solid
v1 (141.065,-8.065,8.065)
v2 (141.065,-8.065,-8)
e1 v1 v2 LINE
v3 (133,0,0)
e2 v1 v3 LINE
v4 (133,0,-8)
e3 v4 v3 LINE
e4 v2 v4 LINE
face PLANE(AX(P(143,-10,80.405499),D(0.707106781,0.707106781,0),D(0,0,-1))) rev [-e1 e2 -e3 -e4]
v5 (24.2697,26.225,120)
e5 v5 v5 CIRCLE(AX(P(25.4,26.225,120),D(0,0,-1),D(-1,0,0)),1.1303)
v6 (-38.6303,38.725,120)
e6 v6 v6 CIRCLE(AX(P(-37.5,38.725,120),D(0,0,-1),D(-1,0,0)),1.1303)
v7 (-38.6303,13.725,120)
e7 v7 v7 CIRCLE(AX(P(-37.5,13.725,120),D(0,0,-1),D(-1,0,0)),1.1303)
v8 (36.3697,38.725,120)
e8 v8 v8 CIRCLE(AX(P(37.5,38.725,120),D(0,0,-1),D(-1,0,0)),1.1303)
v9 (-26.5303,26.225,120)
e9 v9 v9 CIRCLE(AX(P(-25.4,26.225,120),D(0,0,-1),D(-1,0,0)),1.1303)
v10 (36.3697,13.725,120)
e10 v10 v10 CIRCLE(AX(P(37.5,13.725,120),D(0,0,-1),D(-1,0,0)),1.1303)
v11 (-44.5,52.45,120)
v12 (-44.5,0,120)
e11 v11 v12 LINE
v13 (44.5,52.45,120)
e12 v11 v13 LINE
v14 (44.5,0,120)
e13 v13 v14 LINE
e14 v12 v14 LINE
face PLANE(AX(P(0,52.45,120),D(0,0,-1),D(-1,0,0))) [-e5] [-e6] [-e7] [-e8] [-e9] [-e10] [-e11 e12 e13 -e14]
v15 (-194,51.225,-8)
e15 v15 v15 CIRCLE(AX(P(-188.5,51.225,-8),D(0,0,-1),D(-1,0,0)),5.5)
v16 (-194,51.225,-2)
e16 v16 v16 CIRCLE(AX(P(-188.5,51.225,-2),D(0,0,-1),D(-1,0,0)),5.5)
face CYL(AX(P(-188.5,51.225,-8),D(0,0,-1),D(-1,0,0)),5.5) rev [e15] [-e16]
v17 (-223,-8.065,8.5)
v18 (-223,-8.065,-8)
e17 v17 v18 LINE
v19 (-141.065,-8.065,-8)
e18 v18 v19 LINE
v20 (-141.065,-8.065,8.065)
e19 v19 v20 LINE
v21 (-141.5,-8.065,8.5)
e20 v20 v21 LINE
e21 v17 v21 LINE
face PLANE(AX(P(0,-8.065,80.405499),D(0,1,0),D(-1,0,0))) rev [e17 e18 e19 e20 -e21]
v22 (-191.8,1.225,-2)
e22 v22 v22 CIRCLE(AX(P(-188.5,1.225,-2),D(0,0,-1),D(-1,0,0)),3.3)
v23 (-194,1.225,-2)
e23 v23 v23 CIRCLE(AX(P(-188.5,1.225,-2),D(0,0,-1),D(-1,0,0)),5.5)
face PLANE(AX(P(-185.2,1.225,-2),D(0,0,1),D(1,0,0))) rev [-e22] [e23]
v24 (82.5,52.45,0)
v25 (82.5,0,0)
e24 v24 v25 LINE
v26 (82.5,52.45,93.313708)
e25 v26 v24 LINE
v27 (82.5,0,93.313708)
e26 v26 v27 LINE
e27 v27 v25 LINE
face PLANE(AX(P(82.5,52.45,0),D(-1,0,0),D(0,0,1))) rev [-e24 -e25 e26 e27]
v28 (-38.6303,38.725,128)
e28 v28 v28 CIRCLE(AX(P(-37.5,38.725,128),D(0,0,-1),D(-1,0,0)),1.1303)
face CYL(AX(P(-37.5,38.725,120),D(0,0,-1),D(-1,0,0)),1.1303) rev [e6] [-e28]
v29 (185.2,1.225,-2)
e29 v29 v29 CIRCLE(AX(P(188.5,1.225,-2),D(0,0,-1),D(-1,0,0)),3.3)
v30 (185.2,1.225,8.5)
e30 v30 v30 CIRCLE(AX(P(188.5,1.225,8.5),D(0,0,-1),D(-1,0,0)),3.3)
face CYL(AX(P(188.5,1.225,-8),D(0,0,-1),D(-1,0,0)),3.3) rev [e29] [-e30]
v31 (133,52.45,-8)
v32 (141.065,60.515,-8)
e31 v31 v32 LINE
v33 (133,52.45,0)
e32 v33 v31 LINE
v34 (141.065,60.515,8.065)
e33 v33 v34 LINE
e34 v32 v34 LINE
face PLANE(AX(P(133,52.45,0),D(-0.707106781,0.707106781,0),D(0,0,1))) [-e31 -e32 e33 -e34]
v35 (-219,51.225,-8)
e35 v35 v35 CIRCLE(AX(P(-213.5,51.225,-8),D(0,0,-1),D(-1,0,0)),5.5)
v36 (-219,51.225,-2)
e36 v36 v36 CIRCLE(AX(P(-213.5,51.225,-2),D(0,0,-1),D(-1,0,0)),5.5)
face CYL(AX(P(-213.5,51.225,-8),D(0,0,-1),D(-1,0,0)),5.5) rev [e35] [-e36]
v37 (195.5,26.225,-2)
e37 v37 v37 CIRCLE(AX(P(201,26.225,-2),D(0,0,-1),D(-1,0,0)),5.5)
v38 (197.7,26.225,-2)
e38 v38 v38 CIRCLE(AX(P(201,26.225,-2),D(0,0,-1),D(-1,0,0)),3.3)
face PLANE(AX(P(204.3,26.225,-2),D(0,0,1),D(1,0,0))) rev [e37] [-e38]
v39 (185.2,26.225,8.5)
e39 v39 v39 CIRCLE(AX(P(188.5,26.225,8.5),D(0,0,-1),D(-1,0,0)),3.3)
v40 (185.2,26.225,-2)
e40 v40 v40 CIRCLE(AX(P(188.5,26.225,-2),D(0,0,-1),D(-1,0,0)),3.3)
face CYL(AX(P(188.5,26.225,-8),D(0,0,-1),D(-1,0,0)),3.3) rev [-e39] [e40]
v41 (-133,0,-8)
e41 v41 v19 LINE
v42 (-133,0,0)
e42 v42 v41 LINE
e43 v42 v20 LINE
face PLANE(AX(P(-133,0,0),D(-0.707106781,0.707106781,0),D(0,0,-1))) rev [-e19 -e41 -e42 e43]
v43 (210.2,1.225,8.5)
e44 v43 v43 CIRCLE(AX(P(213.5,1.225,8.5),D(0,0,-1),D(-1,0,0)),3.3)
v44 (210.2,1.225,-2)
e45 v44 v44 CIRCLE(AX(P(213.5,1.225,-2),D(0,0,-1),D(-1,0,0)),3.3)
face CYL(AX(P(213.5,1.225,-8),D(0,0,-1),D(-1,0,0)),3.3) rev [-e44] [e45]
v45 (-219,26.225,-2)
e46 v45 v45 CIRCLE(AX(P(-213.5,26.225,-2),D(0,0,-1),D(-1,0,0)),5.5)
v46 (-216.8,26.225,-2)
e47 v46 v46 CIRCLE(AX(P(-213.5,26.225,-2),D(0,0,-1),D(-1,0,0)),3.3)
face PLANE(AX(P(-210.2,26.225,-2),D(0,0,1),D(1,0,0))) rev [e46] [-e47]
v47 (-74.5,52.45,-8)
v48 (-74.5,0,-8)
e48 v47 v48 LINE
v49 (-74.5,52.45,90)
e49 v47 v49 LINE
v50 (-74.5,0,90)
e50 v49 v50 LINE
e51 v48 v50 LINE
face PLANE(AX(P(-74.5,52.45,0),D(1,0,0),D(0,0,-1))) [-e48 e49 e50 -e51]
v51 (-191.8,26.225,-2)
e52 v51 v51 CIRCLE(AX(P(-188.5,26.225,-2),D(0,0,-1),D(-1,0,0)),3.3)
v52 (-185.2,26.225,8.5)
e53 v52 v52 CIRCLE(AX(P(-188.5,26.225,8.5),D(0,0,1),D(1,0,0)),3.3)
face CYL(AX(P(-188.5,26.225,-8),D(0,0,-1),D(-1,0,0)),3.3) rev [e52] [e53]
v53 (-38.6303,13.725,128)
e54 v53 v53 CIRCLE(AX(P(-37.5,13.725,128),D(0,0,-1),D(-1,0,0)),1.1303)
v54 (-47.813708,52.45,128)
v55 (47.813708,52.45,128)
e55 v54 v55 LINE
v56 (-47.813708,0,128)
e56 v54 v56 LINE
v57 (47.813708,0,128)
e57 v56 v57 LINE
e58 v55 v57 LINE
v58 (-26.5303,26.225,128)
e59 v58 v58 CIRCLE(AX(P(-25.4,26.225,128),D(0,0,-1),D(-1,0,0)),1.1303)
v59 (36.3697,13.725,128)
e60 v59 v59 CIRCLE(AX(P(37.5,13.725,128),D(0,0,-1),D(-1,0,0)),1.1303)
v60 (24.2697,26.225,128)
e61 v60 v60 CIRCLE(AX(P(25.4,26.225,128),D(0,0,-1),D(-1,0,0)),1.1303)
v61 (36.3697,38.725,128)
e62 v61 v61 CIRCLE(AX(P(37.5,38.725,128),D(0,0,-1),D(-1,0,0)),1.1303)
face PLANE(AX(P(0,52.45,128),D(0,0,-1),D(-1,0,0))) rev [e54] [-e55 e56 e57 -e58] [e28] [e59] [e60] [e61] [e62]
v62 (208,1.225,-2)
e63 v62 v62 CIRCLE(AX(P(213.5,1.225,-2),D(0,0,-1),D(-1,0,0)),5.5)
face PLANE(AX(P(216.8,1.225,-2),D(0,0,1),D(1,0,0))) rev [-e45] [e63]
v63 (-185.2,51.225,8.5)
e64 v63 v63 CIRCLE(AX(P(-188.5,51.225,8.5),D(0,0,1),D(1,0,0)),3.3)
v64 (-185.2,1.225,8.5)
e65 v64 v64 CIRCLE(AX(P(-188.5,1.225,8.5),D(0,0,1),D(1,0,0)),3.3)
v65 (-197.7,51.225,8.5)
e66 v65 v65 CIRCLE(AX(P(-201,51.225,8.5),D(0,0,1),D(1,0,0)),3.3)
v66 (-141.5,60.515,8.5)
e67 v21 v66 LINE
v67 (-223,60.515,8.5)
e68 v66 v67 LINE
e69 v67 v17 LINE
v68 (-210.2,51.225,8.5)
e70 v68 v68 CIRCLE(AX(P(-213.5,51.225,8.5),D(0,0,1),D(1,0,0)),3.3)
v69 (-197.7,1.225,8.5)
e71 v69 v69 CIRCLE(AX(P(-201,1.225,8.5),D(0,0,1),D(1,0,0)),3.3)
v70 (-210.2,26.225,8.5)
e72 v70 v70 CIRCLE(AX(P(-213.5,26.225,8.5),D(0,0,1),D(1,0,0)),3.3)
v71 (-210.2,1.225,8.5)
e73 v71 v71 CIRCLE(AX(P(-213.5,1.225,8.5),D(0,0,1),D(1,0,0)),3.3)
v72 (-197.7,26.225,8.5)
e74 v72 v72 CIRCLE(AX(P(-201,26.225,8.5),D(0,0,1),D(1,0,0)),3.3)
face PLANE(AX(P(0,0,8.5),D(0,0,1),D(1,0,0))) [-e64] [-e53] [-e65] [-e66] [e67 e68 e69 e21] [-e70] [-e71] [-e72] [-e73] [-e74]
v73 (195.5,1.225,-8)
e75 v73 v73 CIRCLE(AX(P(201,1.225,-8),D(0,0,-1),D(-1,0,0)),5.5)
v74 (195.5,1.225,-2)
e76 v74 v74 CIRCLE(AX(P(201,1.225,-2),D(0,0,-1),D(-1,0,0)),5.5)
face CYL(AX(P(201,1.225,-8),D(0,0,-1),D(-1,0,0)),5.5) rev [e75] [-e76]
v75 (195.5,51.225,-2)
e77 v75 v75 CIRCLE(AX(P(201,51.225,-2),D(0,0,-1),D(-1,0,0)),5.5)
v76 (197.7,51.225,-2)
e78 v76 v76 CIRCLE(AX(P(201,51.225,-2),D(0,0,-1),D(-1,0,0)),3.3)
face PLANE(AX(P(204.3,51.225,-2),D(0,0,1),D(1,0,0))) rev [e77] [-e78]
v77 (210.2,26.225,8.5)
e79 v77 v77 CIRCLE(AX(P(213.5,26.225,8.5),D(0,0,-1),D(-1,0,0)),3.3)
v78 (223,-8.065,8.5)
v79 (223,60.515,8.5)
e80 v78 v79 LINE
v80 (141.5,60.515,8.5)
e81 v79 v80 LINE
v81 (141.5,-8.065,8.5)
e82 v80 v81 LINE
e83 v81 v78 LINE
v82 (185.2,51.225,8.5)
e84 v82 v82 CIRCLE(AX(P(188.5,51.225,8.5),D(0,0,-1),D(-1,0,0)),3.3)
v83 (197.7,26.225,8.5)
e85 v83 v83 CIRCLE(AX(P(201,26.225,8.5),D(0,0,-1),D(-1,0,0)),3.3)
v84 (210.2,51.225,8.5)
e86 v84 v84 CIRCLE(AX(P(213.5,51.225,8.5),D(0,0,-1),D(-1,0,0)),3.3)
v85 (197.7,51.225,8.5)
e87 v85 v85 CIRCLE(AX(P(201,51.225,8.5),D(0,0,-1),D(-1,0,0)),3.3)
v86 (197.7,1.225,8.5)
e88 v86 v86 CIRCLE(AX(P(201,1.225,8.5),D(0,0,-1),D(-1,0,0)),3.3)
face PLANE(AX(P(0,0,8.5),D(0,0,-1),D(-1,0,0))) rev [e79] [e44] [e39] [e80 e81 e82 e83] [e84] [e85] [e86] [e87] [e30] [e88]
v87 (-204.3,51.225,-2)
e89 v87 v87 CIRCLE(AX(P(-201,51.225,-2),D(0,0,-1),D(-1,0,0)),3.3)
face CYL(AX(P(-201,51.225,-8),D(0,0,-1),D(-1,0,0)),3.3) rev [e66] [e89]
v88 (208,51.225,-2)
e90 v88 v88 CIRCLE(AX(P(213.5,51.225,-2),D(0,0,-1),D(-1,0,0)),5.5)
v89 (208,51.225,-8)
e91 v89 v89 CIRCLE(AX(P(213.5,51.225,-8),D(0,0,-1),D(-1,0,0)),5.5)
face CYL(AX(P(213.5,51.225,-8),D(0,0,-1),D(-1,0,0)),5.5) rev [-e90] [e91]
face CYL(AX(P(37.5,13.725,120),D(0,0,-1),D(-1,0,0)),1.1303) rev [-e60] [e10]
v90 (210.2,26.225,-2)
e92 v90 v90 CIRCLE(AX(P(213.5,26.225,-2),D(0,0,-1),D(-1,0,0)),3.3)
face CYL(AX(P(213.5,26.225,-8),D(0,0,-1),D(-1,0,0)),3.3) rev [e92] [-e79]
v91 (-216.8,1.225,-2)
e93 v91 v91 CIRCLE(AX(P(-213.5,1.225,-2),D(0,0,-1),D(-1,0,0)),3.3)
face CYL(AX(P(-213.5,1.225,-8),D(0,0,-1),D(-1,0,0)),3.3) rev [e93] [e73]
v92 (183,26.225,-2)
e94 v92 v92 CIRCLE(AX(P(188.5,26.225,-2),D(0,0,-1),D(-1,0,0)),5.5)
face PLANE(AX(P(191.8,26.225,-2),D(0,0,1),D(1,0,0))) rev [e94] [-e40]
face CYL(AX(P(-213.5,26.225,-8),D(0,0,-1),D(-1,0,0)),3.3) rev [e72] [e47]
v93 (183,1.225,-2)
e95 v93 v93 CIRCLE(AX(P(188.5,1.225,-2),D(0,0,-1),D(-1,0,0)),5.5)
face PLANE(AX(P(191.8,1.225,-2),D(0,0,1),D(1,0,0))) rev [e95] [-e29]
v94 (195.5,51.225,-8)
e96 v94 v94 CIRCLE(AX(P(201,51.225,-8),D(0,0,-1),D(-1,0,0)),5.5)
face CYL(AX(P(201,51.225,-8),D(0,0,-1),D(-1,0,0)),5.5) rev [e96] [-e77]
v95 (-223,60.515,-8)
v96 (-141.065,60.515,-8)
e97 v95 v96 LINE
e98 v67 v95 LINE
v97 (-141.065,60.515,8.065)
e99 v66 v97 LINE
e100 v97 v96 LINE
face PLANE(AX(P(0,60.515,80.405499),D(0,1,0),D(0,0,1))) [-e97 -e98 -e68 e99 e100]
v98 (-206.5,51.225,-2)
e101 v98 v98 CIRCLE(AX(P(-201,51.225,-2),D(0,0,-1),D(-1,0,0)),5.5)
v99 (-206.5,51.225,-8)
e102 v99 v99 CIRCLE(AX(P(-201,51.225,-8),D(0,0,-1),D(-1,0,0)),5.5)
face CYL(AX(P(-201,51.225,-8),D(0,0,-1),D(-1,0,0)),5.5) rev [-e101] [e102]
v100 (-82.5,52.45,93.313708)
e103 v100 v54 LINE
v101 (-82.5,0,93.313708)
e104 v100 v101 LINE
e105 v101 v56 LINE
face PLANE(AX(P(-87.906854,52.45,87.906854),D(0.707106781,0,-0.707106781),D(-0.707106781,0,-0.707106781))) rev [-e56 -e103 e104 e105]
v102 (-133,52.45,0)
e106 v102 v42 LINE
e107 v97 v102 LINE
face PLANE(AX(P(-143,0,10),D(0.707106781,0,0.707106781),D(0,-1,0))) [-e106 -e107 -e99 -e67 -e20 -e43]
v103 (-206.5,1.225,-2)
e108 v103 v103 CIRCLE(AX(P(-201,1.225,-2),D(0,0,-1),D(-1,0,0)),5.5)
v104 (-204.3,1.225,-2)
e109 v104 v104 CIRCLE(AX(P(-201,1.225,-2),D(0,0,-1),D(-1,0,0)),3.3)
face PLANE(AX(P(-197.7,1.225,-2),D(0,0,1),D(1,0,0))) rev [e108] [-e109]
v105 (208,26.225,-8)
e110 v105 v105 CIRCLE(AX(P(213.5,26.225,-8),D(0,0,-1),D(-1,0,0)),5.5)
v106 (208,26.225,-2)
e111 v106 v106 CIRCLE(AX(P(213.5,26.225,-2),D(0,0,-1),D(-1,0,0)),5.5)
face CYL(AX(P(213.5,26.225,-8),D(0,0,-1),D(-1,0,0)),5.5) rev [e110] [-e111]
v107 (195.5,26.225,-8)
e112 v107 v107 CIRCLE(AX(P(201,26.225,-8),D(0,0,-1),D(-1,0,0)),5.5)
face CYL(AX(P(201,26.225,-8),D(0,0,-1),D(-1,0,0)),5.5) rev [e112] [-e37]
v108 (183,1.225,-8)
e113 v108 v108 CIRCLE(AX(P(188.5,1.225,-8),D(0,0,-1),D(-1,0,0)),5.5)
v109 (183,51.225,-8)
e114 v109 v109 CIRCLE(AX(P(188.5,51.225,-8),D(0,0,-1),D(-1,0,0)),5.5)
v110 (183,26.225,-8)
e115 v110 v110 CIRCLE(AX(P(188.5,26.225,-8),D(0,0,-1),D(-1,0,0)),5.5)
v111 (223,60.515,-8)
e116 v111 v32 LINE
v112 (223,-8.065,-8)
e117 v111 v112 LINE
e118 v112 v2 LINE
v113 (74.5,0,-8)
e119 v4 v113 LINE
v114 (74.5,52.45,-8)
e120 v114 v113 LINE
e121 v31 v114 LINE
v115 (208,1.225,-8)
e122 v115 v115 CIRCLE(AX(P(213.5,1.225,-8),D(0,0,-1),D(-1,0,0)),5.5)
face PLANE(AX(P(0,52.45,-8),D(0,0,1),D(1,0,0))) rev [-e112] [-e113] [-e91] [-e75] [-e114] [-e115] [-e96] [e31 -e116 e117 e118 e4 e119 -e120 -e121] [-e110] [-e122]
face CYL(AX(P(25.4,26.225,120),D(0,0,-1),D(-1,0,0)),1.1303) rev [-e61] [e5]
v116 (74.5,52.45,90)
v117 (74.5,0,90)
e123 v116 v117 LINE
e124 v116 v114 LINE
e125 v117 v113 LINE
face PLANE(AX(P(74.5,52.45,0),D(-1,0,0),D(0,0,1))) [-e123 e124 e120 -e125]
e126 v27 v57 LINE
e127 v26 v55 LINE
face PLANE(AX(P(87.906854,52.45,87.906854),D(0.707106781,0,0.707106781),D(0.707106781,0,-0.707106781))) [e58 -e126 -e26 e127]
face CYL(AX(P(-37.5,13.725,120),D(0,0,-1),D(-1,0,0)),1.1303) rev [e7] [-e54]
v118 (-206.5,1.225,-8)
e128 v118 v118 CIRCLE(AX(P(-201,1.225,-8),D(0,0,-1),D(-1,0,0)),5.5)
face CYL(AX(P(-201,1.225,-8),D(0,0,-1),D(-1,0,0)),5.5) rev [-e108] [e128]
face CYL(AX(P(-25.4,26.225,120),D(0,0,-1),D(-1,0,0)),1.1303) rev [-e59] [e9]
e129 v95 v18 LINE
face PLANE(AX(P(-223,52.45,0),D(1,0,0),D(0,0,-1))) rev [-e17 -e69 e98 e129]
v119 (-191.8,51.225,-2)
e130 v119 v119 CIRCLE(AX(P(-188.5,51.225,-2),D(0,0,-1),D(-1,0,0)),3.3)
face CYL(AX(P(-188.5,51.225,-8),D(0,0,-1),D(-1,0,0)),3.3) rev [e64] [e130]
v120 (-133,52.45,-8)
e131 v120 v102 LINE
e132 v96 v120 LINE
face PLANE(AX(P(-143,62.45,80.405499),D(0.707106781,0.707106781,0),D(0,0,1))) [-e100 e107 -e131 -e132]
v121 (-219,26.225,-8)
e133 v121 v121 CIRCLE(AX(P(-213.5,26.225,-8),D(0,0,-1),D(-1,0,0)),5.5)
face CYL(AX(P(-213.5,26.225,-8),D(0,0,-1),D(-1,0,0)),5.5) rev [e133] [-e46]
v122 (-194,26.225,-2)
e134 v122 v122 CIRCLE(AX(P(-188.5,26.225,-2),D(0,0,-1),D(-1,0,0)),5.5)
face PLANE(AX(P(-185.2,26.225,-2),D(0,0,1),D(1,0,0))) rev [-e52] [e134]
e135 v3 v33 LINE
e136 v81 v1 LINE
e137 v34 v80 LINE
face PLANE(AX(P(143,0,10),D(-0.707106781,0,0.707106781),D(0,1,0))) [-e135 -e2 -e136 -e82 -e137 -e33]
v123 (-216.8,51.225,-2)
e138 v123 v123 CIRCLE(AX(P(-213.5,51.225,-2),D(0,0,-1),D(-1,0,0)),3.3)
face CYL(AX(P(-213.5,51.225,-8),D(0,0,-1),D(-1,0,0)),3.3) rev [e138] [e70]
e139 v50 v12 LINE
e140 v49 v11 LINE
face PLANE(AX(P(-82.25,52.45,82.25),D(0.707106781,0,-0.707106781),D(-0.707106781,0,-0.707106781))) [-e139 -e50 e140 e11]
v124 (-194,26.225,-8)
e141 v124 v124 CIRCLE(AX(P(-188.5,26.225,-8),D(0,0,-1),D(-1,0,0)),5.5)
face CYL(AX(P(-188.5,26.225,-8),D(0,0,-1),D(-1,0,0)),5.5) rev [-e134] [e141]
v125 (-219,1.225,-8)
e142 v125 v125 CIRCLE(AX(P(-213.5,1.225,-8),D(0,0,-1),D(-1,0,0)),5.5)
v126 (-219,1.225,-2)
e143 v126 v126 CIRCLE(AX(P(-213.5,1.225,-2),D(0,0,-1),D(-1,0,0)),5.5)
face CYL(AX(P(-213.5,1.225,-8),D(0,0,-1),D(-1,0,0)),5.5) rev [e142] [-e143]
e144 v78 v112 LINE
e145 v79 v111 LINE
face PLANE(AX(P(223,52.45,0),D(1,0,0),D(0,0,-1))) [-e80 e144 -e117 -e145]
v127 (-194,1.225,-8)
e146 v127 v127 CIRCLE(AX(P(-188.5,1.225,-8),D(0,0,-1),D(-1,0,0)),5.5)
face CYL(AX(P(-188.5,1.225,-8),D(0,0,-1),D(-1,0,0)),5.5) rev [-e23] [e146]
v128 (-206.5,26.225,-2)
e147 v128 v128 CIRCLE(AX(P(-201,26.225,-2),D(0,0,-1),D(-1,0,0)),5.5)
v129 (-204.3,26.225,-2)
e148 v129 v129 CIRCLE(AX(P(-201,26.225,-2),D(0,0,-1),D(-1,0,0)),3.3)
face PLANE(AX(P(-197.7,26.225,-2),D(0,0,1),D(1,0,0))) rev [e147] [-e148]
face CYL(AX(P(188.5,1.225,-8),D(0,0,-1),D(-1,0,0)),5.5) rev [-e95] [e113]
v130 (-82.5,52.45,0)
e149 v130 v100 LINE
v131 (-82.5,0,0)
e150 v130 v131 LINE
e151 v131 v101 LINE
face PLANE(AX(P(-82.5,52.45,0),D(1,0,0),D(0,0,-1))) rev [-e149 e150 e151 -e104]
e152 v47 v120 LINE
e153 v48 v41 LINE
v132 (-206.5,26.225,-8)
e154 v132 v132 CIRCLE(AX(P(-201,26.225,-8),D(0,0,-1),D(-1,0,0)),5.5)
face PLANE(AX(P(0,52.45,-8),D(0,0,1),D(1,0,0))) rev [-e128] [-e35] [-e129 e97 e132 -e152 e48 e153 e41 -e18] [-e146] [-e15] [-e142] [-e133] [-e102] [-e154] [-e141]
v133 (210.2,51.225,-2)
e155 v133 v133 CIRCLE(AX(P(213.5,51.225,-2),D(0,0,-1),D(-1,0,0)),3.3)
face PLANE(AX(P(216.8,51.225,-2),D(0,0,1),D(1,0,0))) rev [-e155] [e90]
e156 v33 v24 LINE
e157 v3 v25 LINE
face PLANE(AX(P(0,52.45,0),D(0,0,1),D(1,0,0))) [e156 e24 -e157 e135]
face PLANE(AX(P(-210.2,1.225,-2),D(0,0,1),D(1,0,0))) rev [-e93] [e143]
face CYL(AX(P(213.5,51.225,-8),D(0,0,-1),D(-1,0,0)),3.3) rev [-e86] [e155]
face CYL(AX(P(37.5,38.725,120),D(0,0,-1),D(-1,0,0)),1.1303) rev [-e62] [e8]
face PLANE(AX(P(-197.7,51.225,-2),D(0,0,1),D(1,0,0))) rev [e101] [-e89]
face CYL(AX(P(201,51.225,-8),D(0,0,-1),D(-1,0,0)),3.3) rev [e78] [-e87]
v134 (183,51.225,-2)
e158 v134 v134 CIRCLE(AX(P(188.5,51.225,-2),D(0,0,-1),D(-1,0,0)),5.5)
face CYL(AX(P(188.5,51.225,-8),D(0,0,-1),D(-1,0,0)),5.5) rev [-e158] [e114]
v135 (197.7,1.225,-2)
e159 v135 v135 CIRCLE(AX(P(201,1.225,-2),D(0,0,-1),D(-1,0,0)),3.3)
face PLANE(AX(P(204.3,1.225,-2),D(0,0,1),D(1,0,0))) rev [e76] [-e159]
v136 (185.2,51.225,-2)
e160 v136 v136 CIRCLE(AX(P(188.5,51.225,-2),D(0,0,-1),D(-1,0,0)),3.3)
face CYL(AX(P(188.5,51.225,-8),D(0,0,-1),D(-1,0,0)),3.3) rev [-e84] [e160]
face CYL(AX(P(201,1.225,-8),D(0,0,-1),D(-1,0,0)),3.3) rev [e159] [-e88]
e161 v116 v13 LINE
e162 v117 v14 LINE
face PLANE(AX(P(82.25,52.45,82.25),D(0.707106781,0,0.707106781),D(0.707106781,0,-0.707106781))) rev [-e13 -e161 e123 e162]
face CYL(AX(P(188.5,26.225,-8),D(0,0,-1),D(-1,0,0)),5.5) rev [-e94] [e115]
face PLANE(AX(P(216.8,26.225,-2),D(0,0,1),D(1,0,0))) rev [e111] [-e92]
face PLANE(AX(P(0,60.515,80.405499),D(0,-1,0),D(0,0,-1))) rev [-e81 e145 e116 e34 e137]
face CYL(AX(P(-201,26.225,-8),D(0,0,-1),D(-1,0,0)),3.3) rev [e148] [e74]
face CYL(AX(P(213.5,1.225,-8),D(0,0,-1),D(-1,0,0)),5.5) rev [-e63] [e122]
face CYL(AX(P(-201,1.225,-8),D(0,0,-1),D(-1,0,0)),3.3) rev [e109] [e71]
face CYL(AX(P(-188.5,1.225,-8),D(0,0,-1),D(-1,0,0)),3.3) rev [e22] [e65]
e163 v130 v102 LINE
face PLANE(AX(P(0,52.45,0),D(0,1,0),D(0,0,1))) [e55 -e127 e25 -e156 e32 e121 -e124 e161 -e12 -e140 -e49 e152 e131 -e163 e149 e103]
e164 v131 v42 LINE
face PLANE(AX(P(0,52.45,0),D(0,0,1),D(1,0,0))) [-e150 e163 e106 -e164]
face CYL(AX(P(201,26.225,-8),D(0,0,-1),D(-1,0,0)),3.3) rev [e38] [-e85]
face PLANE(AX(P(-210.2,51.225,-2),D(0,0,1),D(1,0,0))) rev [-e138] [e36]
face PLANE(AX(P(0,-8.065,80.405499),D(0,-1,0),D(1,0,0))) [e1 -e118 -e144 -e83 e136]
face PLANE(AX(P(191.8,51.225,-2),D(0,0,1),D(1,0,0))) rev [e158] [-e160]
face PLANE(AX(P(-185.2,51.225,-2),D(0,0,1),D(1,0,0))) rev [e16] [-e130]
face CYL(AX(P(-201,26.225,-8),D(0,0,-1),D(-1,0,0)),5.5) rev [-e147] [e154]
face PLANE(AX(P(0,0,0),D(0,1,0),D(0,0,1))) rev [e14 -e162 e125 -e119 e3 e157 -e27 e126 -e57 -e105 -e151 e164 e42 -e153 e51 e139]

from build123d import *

# Parameters (mm, degrees)
BOSS_EXTRUDE1_DEPTH            = 52.45
F_4_40_TAPPED_HOLE1_D          = 2.2606
SKETCH14_W                     = 80
SKETCH14_H                     = 8.065
BOSS_EXTRUDE2_DEPTH            = 8
SKETCH19_W                     = 80
SKETCH19_H                     = 68.58
BOSS_EXTRUDE3_DEPTH            = 8.5
CBORE_FOR_M6_SHCS2_D           = 6.6
CBORE_FOR_M6_SHCS2_CBORE_D     = 11
CBORE_FOR_M6_SHCS2_CBORE_DEPTH = 6
CHAMFER1_SIZE                  = 10
CHAMFER2_SIZE                  = 10
CHAMFER3_SIZE                  = 10


with BuildPart() as part:
    # Sketch1 → Boss-Extrude1 (new body)
    with BuildSketch(Plane(origin=(0, 0, 0), x_dir=(1, 0, 0), z_dir=(0, 1, 0))):
        Polygon((74.5, 8), (74.5, -90), (44.5, -120), (-44.5, -120), (-74.5, -90), (-74.5, 8), (-223, 8), (-223, 0), (-82.5, 0), (-82.5, -93.313708499), (-47.813708499, -128), (47.813708499, -128), (82.5, -93.313708499), (82.5, 0), (223, 0), (223, 8), align=None)
    extrude(amount=BOSS_EXTRUDE1_DEPTH)

    # #4-40 Tapped Hole1 (through all)
    with Locations(Plane(origin=(0, 0, 120), x_dir=(-1, 0, 0), z_dir=(0, 0, -1))):
        with Locations((-37.5, 38.725), (-37.5, 13.725), (37.5, 13.725), (37.5, 38.725), (-25.4, 26.225), (25.4, 26.225)):
            Hole(F_4_40_TAPPED_HOLE1_D / 2)

    # Sketch14 → Boss-Extrude2 (add)
    with BuildSketch(Plane(origin=(0, 0, -8), x_dir=(-1, 0, 0), z_dir=(0, 0, -1))):
        with Locations((-183, 56.4825)):
            Rectangle(SKETCH14_W, SKETCH14_H)
        with Locations((-183, -4.0325)):
            Rectangle(SKETCH14_W, SKETCH14_H)
        with Locations((183, -4.0325)):
            Rectangle(SKETCH14_W, SKETCH14_H)
        with Locations((183, 56.4825)):
            Rectangle(SKETCH14_W, SKETCH14_H)
    extrude(amount=-BOSS_EXTRUDE2_DEPTH)

    # Sketch19 → Boss-Extrude3 (add)
    with BuildSketch(Plane.XY):
        with Locations((-183, 26.225)):
            Rectangle(SKETCH19_W, SKETCH19_H)
        with Locations((183, 26.225)):
            Rectangle(SKETCH19_W, SKETCH19_H)
    extrude(amount=BOSS_EXTRUDE3_DEPTH)

    # CBORE for M6 SHCS2 (through all)
    with Locations(Plane(origin=(0, 0, -8), x_dir=(-1, 0, 0), z_dir=(0, 0, -1))):
        with Locations((-201, 1.225), (-201, 26.225), (-201, 51.225), (201, 1.225), (201, 26.225), (201, 51.225), (-188.5, 51.225), (-213.5, 51.225), (-213.5, 1.225), (-213.5, 26.225), (-188.5, 26.225), (-188.5, 1.225), (188.5, 1.225), (188.5, 26.225), (188.5, 51.225), (213.5, 51.225), (213.5, 1.225), (213.5, 26.225)):
            CounterBoreHole(CBORE_FOR_M6_SHCS2_D / 2, CBORE_FOR_M6_SHCS2_CBORE_D / 2, CBORE_FOR_M6_SHCS2_CBORE_DEPTH)

    # Chamfer1
    # the kernel refuses this chamfer: 10 mm, written as the material it adds along each edge
    with BuildSketch(Plane(origin=(143, 52.45, -8), x_dir=(-0.9996219169112968, -0.027495876610586282, 0), z_dir=(0, 0, 1))) as chamfer1_piece_1_section:
        Polygon((CHAMFER1_SIZE * 0.999621916911, -CHAMFER1_SIZE * 0.0274958766106), (-CHAMFER1_SIZE * 0.0274958766106, -CHAMFER1_SIZE * 0.999621916911), (0, 0), align=None)
    chamfer1_piece_1 = extrude(amount=8, mode=Mode.PRIVATE)
    chamfer1_piece_1 = split(chamfer1_piece_1, bisect_by=Plane(origin=(139.550321437, 60.515, -4), z_dir=(0, -1, 0)), keep=Keep.TOP, mode=Mode.PRIVATE)
    add(chamfer1_piece_1)
    with BuildSketch(Plane(origin=(143, 0, -8), x_dir=(-0.9996219169112969, 0.027495876610581386, 0), z_dir=(0, 0, 1))) as chamfer1_piece_2_section:
        Polygon((CHAMFER1_SIZE * 0.999621916911, CHAMFER1_SIZE * 0.0274958766106), (-CHAMFER1_SIZE * 0.0274958766106, CHAMFER1_SIZE * 0.999621916911), (0, 0), align=None)
    chamfer1_piece_2 = extrude(amount=8, mode=Mode.PRIVATE)
    chamfer1_piece_2 = split(chamfer1_piece_2, bisect_by=Plane(origin=(139.550321437, -8.065, -4), z_dir=(0, 1, 0)), keep=Keep.TOP, mode=Mode.PRIVATE)
    add(chamfer1_piece_2)
    with BuildSketch(Plane(origin=(-143, 0, -8), x_dir=(0.9996219169112969, 0.027495876610581386, 0), z_dir=(0, 0, 1))) as chamfer1_piece_3_section:
        Polygon((CHAMFER1_SIZE * 0.999621916911, -CHAMFER1_SIZE * 0.0274958766106), (-CHAMFER1_SIZE * 0.0274958766106, -CHAMFER1_SIZE * 0.999621916911), (0, 0), align=None)
    chamfer1_piece_3 = extrude(amount=8, mode=Mode.PRIVATE)
    chamfer1_piece_3 = split(chamfer1_piece_3, bisect_by=Plane(origin=(-139.550321437, -8.065, -4), z_dir=(0, 1, 0)), keep=Keep.TOP, mode=Mode.PRIVATE)
    add(chamfer1_piece_3)
    with BuildSketch(Plane(origin=(-143, 52.45, -8), x_dir=(0.9996219169112968, -0.027495876610586282, 0), z_dir=(0, 0, 1))) as chamfer1_piece_4_section:
        Polygon((CHAMFER1_SIZE * 0.999621916911, CHAMFER1_SIZE * 0.0274958766106), (-CHAMFER1_SIZE * 0.0274958766106, CHAMFER1_SIZE * 0.999621916911), (0, 0), align=None)
    chamfer1_piece_4 = extrude(amount=8, mode=Mode.PRIVATE)
    chamfer1_piece_4 = split(chamfer1_piece_4, bisect_by=Plane(origin=(-139.550321437, 60.515, -4), z_dir=(0, -1, 0)), keep=Keep.TOP, mode=Mode.PRIVATE)
    add(chamfer1_piece_4)

    # Chamfer2
    # the kernel refuses this chamfer: 10 mm, written as the material it adds along each edge
    with BuildSketch(Plane(origin=(143, -8.065, 0), x_dir=(0.027495876610908077, 0, 0.9996219169112879), z_dir=(0, 1, 0))) as chamfer2_piece_1_section:
        Polygon((CHAMFER2_SIZE * 0.999621916911, -CHAMFER2_SIZE * 0.0274958766106), (-CHAMFER2_SIZE * 0.0274958766109, -CHAMFER2_SIZE * 0.999621916911), (0, 0), align=None)
    chamfer2_piece_1 = extrude(amount=68.58, mode=Mode.PRIVATE)
    chamfer2_piece_1 = split(chamfer2_piece_1, bisect_by=Plane(origin=(140.422114736, -3.467675987, 8.5), z_dir=(0, 0, -1)), keep=Keep.TOP, mode=Mode.PRIVATE)
    chamfer2_piece_1 = split(chamfer2_piece_1, bisect_by=Plane(origin=(138.444895362, -5.444895362, 3.487912503), z_dir=(0.7071067811868302, 0.7071067811862648, 0)), keep=Keep.TOP, mode=Mode.PRIVATE)
    chamfer2_piece_1 = split(chamfer2_piece_1, bisect_by=Plane(origin=(140.422114736, 0, 3.487912503), z_dir=(0, -1, 0)), keep=Keep.TOP, mode=Mode.PRIVATE)
    add(chamfer2_piece_1)
    with BuildSketch(Plane(origin=(143, -8.065, 0), x_dir=(0.027495876610908077, 0, 0.9996219169112879), z_dir=(0, 1, 0))) as chamfer2_piece_2_section:
        Polygon((CHAMFER2_SIZE * 0.999621916911, -CHAMFER2_SIZE * 0.0274958766106), (-CHAMFER2_SIZE * 0.0274958766109, -CHAMFER2_SIZE * 0.999621916911), (0, 0), align=None)
    chamfer2_piece_2 = extrude(amount=68.58, mode=Mode.PRIVATE)
    chamfer2_piece_2 = split(chamfer2_piece_2, bisect_by=Plane(origin=(139.596737512, 52.45, 3.097187729), z_dir=(0, -1, 0)), keep=Keep.TOP, mode=Mode.PRIVATE)
    chamfer2_piece_2 = split(chamfer2_piece_2, bisect_by=Plane(origin=(139.596737512, 26.225, 8.5), z_dir=(0, 0, -1)), keep=Keep.TOP, mode=Mode.PRIVATE)
    chamfer2_piece_2 = split(chamfer2_piece_2, bisect_by=Plane(origin=(139.596737512, 0, 3.097187729), z_dir=(0, 1, 0)), keep=Keep.TOP, mode=Mode.PRIVATE)
    add(chamfer2_piece_2)
    with BuildSketch(Plane(origin=(143, -8.065, 0), x_dir=(0.027495876610908077, 0, 0.9996219169112879), z_dir=(0, 1, 0))) as chamfer2_piece_3_section:
        Polygon((CHAMFER2_SIZE * 0.999621916911, -CHAMFER2_SIZE * 0.0274958766106), (-CHAMFER2_SIZE * 0.0274958766109, -CHAMFER2_SIZE * 0.999621916911), (0, 0), align=None)
    chamfer2_piece_3 = extrude(amount=68.58, mode=Mode.PRIVATE)
    chamfer2_piece_3 = split(chamfer2_piece_3, bisect_by=Plane(origin=(140.422114736, 52.45, 3.487912503), z_dir=(0, 1, 0)), keep=Keep.TOP, mode=Mode.PRIVATE)
    chamfer2_piece_3 = split(chamfer2_piece_3, bisect_by=Plane(origin=(140.422114736, 55.917675987, 8.5), z_dir=(0, 0, -1)), keep=Keep.TOP, mode=Mode.PRIVATE)
    chamfer2_piece_3 = split(chamfer2_piece_3, bisect_by=Plane(origin=(138.444895362, 57.894895362, 3.487912503), z_dir=(0.7071067811868302, -0.7071067811862648, 0)), keep=Keep.TOP, mode=Mode.PRIVATE)
    add(chamfer2_piece_3)

    # Chamfer3
    # the kernel refuses this chamfer: 10 mm, written as the material it adds along each edge
    with BuildSketch(Plane(origin=(-143, 60.515, 0), x_dir=(-0.027495876610908083, 0, 0.9996219169112879), z_dir=(0, -1, 0))) as chamfer3_piece_1_section:
        Polygon((CHAMFER3_SIZE * 0.999621916911, -CHAMFER3_SIZE * 0.0274958766106), (-CHAMFER3_SIZE * 0.0274958766109, -CHAMFER3_SIZE * 0.999621916911), (0, 0), align=None)
    chamfer3_piece_1 = extrude(amount=68.58, mode=Mode.PRIVATE)
    chamfer3_piece_1 = split(chamfer3_piece_1, bisect_by=Plane(origin=(-140.422114736, 55.917675987, 8.5), z_dir=(0, 0, -1)), keep=Keep.TOP, mode=Mode.PRIVATE)
    chamfer3_piece_1 = split(chamfer3_piece_1, bisect_by=Plane(origin=(-138.444895362, 57.894895362, 3.487912503), z_dir=(-0.7071067811868302, -0.7071067811862648, 0)), keep=Keep.TOP, mode=Mode.PRIVATE)
    chamfer3_piece_1 = split(chamfer3_piece_1, bisect_by=Plane(origin=(-140.422114736, 52.45, 3.487912503), z_dir=(0, 1, 0)), keep=Keep.TOP, mode=Mode.PRIVATE)
    add(chamfer3_piece_1)
    with BuildSketch(Plane(origin=(-143, 60.515, 0), x_dir=(-0.027495876610908083, 0, 0.9996219169112879), z_dir=(0, -1, 0))) as chamfer3_piece_2_section:
        Polygon((CHAMFER3_SIZE * 0.999621916911, -CHAMFER3_SIZE * 0.0274958766106), (-CHAMFER3_SIZE * 0.0274958766109, -CHAMFER3_SIZE * 0.999621916911), (0, 0), align=None)
    chamfer3_piece_2 = extrude(amount=68.58, mode=Mode.PRIVATE)
    chamfer3_piece_2 = split(chamfer3_piece_2, bisect_by=Plane(origin=(-139.596737512, 0, 3.097187729), z_dir=(0, 1, 0)), keep=Keep.TOP, mode=Mode.PRIVATE)
    chamfer3_piece_2 = split(chamfer3_piece_2, bisect_by=Plane(origin=(-139.596737512, 26.225, 8.5), z_dir=(0, 0, -1)), keep=Keep.TOP, mode=Mode.PRIVATE)
    chamfer3_piece_2 = split(chamfer3_piece_2, bisect_by=Plane(origin=(-139.596737512, 52.45, 3.097187729), z_dir=(0, -1, 0)), keep=Keep.TOP, mode=Mode.PRIVATE)
    add(chamfer3_piece_2)
    with BuildSketch(Plane(origin=(-143, 60.515, 0), x_dir=(-0.027495876610908083, 0, 0.9996219169112879), z_dir=(0, -1, 0))) as chamfer3_piece_3_section:
        Polygon((CHAMFER3_SIZE * 0.999621916911, -CHAMFER3_SIZE * 0.0274958766106), (-CHAMFER3_SIZE * 0.0274958766109, -CHAMFER3_SIZE * 0.999621916911), (0, 0), align=None)
    chamfer3_piece_3 = extrude(amount=68.58, mode=Mode.PRIVATE)
    chamfer3_piece_3 = split(chamfer3_piece_3, bisect_by=Plane(origin=(-140.422114736, 0, 3.487912503), z_dir=(0, -1, 0)), keep=Keep.TOP, mode=Mode.PRIVATE)
    chamfer3_piece_3 = split(chamfer3_piece_3, bisect_by=Plane(origin=(-140.422114736, -3.467675987, 8.5), z_dir=(0, 0, -1)), keep=Keep.TOP, mode=Mode.PRIVATE)
    chamfer3_piece_3 = split(chamfer3_piece_3, bisect_by=Plane(origin=(-138.444895362, -5.444895362, 3.487912503), z_dir=(-0.7071067811868302, 0.7071067811862648, 0)), keep=Keep.TOP, mode=Mode.PRIVATE)
    add(chamfer3_piece_3)


solid = part.part
